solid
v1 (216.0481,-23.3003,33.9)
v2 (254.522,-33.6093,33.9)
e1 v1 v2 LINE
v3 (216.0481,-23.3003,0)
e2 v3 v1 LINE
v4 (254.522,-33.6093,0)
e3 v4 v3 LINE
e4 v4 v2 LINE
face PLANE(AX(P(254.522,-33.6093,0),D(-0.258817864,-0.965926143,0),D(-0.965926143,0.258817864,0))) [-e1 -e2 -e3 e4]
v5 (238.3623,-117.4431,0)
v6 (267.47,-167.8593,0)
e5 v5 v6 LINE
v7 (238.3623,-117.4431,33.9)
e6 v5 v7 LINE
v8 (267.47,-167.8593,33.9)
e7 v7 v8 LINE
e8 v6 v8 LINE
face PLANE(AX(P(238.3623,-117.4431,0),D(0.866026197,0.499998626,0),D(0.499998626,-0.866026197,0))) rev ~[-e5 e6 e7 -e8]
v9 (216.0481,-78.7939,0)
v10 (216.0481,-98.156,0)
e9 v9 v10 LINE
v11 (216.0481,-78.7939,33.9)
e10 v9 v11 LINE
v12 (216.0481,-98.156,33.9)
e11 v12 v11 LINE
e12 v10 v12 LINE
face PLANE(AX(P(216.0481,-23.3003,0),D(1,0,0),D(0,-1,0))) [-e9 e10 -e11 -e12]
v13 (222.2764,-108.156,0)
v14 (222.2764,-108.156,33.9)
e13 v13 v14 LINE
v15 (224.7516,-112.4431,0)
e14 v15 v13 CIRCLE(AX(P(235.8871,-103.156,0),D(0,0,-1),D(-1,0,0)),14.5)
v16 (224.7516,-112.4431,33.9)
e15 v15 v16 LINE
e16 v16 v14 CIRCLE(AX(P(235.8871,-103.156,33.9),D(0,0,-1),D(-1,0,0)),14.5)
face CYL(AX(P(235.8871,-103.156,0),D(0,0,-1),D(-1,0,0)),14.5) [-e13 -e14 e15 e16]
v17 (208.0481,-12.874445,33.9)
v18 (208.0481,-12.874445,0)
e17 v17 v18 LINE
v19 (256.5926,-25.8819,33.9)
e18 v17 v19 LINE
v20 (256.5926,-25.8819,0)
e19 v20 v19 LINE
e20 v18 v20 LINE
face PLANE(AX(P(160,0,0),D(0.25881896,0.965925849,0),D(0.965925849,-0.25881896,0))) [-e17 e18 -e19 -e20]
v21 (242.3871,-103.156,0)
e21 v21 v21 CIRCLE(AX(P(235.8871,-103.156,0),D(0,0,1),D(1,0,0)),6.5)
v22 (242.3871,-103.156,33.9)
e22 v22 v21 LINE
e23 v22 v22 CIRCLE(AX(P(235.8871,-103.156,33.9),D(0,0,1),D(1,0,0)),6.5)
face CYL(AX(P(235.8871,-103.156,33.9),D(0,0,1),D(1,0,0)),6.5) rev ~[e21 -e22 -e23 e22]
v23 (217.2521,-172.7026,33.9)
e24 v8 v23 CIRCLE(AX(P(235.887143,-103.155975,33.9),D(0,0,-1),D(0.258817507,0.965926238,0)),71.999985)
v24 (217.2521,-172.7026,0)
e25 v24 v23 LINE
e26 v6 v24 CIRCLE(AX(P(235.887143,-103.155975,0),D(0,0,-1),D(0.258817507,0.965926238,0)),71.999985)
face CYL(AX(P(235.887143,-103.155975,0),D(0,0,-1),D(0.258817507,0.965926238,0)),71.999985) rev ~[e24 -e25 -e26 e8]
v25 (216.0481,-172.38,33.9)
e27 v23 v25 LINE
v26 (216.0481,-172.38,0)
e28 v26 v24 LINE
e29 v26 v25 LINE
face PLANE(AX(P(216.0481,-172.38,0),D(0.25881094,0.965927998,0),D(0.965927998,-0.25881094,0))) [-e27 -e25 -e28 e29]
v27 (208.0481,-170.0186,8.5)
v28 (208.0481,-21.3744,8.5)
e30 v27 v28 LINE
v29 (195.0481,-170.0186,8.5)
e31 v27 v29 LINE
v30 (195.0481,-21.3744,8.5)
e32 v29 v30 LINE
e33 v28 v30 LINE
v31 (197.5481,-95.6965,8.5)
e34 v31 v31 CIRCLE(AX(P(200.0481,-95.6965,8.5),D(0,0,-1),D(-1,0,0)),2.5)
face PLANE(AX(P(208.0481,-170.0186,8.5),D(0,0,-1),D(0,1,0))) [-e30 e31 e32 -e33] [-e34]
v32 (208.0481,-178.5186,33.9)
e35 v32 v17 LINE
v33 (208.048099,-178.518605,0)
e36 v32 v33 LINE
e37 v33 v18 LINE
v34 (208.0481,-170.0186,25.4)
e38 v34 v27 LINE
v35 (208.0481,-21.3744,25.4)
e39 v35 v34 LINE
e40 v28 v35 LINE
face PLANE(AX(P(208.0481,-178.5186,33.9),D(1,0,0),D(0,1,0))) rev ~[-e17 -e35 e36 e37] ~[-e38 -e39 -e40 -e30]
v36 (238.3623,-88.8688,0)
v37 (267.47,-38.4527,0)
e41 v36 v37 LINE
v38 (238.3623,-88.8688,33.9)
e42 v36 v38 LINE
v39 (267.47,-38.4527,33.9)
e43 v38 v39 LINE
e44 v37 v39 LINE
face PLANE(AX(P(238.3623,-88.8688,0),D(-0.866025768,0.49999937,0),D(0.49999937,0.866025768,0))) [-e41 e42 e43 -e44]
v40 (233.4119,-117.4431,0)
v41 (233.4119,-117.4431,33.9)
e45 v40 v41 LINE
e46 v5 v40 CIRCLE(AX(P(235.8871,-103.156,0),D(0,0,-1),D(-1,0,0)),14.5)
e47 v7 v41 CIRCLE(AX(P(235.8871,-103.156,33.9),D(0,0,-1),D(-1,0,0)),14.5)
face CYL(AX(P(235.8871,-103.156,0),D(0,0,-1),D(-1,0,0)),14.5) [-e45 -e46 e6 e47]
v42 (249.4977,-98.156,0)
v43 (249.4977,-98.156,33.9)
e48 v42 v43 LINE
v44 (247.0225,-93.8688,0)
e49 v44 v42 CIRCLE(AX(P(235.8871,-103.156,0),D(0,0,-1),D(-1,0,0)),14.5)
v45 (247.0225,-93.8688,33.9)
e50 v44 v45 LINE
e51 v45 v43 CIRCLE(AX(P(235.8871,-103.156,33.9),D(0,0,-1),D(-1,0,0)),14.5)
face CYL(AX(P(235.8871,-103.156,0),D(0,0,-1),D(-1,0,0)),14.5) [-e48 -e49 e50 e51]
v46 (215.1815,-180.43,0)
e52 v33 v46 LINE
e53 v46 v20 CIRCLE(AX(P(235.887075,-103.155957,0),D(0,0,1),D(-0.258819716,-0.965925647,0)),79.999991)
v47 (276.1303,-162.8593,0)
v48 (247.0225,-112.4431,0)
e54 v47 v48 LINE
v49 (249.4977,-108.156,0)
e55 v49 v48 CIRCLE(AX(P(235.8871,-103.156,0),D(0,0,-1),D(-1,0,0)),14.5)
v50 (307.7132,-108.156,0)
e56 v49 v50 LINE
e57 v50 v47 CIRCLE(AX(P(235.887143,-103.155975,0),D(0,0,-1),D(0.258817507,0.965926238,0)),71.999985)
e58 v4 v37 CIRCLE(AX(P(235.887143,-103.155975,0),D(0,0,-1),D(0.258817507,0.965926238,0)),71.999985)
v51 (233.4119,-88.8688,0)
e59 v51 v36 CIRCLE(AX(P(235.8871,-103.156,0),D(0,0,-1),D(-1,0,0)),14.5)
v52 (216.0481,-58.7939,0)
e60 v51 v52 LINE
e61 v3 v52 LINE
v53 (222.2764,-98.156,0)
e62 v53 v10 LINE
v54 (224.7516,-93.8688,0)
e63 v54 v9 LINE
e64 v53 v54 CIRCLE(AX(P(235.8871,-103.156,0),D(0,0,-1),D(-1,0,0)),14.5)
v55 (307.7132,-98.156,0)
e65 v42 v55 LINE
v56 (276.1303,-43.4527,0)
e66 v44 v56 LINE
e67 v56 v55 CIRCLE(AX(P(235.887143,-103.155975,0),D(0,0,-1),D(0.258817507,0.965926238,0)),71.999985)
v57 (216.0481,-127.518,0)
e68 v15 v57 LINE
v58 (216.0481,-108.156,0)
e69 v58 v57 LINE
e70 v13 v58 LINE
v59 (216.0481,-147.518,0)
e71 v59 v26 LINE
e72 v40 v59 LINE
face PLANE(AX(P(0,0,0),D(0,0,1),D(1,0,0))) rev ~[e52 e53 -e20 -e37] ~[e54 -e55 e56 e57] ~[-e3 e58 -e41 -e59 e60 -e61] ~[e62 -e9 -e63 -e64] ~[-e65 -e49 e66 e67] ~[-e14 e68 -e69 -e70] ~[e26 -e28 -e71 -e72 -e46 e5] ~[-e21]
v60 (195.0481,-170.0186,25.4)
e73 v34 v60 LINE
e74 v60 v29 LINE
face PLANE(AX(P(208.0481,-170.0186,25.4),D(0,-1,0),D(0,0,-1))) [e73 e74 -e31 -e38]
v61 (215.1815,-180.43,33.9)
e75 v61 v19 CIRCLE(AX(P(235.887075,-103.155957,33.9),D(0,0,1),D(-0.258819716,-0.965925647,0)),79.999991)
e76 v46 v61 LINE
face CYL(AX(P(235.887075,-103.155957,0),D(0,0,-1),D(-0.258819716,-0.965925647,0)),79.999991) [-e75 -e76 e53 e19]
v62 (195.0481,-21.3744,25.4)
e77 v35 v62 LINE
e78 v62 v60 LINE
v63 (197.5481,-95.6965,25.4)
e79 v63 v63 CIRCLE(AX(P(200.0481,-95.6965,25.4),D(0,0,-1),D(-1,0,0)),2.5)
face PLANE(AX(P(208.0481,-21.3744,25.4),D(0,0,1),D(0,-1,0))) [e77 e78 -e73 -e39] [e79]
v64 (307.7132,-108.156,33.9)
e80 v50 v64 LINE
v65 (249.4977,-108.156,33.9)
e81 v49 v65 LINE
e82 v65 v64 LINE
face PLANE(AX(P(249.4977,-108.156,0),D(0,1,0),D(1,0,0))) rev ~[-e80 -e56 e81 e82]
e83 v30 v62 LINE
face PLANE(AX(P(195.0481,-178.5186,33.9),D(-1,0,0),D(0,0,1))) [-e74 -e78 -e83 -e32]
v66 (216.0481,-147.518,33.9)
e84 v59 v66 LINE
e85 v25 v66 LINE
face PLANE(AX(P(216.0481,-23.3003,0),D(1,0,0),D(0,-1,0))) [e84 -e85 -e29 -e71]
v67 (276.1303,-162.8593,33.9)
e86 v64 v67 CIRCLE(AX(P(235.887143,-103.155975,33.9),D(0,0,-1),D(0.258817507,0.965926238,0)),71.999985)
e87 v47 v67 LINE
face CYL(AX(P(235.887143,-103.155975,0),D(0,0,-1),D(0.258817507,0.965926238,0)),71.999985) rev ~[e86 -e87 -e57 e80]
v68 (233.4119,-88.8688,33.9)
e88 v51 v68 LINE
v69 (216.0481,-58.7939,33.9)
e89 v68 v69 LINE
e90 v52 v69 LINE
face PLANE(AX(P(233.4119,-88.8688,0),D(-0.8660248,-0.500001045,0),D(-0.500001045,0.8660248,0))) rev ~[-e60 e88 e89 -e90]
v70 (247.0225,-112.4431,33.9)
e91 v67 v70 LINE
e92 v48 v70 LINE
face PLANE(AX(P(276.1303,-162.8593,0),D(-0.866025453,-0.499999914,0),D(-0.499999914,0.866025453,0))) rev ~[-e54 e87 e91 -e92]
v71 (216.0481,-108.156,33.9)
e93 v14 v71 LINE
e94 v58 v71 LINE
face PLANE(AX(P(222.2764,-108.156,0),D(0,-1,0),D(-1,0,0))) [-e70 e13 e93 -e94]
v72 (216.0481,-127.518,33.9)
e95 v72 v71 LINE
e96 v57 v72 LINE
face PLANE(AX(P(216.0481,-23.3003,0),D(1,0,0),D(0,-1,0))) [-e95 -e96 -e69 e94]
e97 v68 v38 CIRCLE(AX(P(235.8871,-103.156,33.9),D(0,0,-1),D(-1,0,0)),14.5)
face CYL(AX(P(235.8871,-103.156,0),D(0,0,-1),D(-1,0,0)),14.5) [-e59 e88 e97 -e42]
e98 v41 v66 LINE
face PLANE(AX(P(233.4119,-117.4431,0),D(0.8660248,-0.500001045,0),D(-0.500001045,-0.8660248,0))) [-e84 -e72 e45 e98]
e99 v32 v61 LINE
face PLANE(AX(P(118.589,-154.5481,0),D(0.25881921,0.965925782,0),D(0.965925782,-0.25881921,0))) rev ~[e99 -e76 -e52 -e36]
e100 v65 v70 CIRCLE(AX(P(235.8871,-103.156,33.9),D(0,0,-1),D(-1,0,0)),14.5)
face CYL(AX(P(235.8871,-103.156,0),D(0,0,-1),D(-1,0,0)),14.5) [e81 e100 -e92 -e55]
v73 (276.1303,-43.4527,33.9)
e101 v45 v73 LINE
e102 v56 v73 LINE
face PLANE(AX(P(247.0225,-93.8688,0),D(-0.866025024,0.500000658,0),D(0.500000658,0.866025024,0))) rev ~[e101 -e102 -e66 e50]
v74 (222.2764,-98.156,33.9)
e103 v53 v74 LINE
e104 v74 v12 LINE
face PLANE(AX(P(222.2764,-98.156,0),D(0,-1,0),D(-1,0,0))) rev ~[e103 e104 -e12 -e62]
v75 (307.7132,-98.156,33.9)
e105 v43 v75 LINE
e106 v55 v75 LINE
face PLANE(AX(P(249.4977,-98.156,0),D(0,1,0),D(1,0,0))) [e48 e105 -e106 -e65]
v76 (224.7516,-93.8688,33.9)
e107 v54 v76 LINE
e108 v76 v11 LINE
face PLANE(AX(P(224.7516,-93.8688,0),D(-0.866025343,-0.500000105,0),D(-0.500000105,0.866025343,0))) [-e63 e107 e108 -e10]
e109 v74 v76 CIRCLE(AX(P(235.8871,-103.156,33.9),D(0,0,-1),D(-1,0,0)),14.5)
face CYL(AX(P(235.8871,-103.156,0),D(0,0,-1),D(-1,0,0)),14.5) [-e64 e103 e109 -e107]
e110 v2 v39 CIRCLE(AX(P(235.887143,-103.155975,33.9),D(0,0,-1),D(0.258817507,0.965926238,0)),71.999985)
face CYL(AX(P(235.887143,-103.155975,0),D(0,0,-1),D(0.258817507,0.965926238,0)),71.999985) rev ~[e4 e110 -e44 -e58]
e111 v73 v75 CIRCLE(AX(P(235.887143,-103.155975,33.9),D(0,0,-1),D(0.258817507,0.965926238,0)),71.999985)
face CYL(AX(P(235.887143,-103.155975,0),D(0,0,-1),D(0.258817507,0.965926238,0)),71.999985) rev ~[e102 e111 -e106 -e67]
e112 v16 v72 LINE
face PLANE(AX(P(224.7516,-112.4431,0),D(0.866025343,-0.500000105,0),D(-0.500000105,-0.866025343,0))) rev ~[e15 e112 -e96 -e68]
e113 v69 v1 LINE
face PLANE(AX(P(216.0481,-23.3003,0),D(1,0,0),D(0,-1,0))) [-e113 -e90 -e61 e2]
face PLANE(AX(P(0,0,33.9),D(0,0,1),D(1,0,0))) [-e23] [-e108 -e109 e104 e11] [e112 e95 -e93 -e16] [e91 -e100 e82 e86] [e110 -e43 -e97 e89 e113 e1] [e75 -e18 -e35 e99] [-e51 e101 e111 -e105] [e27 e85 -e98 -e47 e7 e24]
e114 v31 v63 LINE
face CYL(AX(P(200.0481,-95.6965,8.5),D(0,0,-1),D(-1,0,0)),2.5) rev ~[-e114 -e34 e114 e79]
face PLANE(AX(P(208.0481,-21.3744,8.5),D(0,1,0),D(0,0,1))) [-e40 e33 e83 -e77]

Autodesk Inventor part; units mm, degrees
ref_plane "YZ Plane" through (0, 0, 0) normal (1, 0, 0) x (0, 1, 0)
ref_plane "XZ Plane" through (0, 0, 0) normal (0, 1, 0) x (-1, 0, 0)
ref_plane "XY Plane" through (0, 0, 0) normal (0, 0, 1) x (1, 0, 0)
sketch "Sketch1" plane through (0, 0, 0) normal (0, 0, 1) x (1, 0, 0)
  line L0 (0, 0) -> (160, 0)
  line L1 (160, 0) -> (118.589, -154.5481) construction
  line L2 (0, 0) -> (41.411, -154.5481) construction
  line L3 (41.411, -154.5481) -> (118.589, -154.5481)
  circle A0 centre (235.8871, -103.156) radius 80 construction
  line L4 (160, 0) -> (256.5926, -25.8819)
  line L5 (118.589, -154.5481) -> (215.1815, -180.43)
  arc A1 (215.1815, -180.43) -> (256.5926, -25.8819) centre (235.8871, -103.156) ccw
  circle A2 centre (-75.8871, -103.156) radius 80 construction
  line L6 (0, 0) -> (-96.5926, -25.8819)
  line L7 (41.411, -154.5481) -> (-55.1815, -180.43)
  arc A3 (-96.5926, -25.8819) -> (-55.1815, -180.43) centre (-75.8871, -103.156) ccw
  dimension "d0" = 160
  dimension "d1" = 160
  dimension "d2" = 160
  dimension "d3" = 75
  dimension "d4" = 75
  dimension "d5" = 160
  dimension "d6" = 100
  dimension "d7" = 160
  dimension "d9" = 100
extrude "Extrusion1" add sketch "Sketch1" along normal blind 33.9
sketch "Sketch2" plane through (0, 0, 33.9) normal (0, 0, 1) x (1, 0, 0)
  line L0 (-26.5, -133) -> (186.5, -133)
  line L1 (186.5, -133) -> (186.5, -20)
  line L2 (186.5, -20) -> (-26.5, -20)
  line L3 (-26.5, -20) -> (-26.5, -133)
  line L4 (160, 0) -> (0, 0) projected
  point P0 (80, -20)
  point P1 (80, 0)
  dimension "d12" = 213
  dimension "d13" = 113
  dimension "d14" = 20
extrude "Extrusion2" cut sketch "Sketch2" against normal through all
sketch "Sketch3" plane through (0, 0, 33.9) normal (0, 0, 1) x (1, 0, 0)
  line L0 (-26.5, -133) -> (-26.5, -20) construction
  line L1 (-26.5, -20) -> (186.5, -20) construction
  line L2 (186.5, -20) -> (186.5, -133) construction
  line L3 (186.5, -133) -> (-26.5, -133) construction
  line L4 (-48.0481, 1.5481) -> (-48.0481, -154.5481) construction
  line L5 (-48.0481, -154.5481) -> (208.0481, -154.5481) construction
  line L6 (208.0481, -154.5481) -> (208.0481, 1.5481) construction
  line L7 (208.0481, 1.5481) -> (-48.0481, 1.5481) construction
  line L8 (41.411, -154.5481) -> (118.589, -154.5481) construction
  line L9 (-48.0481, 1.5481) -> (-48.0481, -178.5186) construction
  line L10 (-55.1815, -180.43) -> (41.411, -154.5481) construction
  line L11 (208.0481, 1.5481) -> (208.0481, -178.5186) construction
  line L12 (118.589, -154.5481) -> (215.1815, -180.43) construction
  line L13 (-48.0481, -178.5186) -> (208.0481, -178.5186) construction
  line L14 (-48.0481, 1.5481) -> (208.0481, 1.5481) construction
  line L15 (160, 0) -> (256.5926, -25.8819) construction
  line L16 (208.2963, -12.941) -> (208.0481, -178.5186)
  line L17 (208.2963, -12.941) -> (256.5926, -25.8819)
  line L18 (208.0481, -178.5186) -> (215.1815, -180.43)
  arc A0 (215.1815, -180.43) -> (256.5926, -25.8819) centre (235.8871, -103.156) ccw
  line L19 (208.0481, 1.5481) -> (-166.9519, 1.5481)
  line L20 (-166.9519, 1.5481) -> (-166.9519, -188.4519)
  line L21 (-166.9519, -188.4519) -> (208.0481, -188.4519)
  line L22 (208.0481, -188.4519) -> (208.0481, 1.5481)
  point P0 (0, 0)
  point P1 (80, -154.5481)
  dimension "d17" = 190
  dimension "d18" = 375
extrude "Extrusion3" cut sketch "Sketch3" against normal through all contours L22 L21 L20 L19
sketch "Sketch4" plane through (0, 0, 33.9) normal (0, 0, 1) x (1, 0, 0)
  arc A0 (215.1815, -180.43) -> (256.5926, -25.8819) centre (235.8871, -103.156) ccw projected
  circle A1 centre (235.8871, -103.156) radius 6.5
  point P0 (0, 0)
  dimension "d21" = 13
extrude "Extrusion4" cut sketch "Sketch4" against normal through all
sketch "Sketch5" plane through (208.0481, -178.5186, 33.9) normal (-1, 0, 0) x (0, 0, 1)
  line L0 (-33.9, 165.6442) -> (0, 165.6442) projected
  line L1 (-33.9, 0) -> (-33.9, 165.6442) projected
  line L2 (0, 0) -> (-33.9, 0) projected
  line L3 (0, 165.6442) -> (0, 0) projected
  line L4 (-25.4, 157.1442) -> (-8.5, 157.1442)
  line L5 (-8.5, 157.1442) -> (-8.5, 8.5)
  line L6 (-8.5, 8.5) -> (-25.4, 8.5)
  line L7 (-25.4, 8.5) -> (-25.4, 157.1442)
  point P0 (-33.9, 178.5186)
  dimension "d24" = 8.5
extrude "Extrusion5" add sketch "Sketch5" along normal blind 13 contours L4 L5 L6 L7
sketch "Sketch6" plane through (208.0481, -170.0186, 8.5) normal (0, 0, -1) x (-1, 0, 0)
  circle A0 centre (8, 74.3221) radius 2.5
  line L0 (0, -8.5) -> (0, 157.1442) projected
  point P0 (208.0481, 170.0186)
  point P1 (0, 74.3221)
  dimension "d27" = 5
  dimension "d28" = 8
extrude "Extrusion6" cut sketch "Sketch6" against normal through all
sketch "Sketch7" plane through (0, 0, 0) normal (0, 0, -1) x (-1, 0, 0)
  circle A0 centre (-235.8871, -103.156) radius 6.5 projected
  line L0 (-208.0481, -178.5186) -> (-208.0481, -12.8745) projected
  line L1 (-208.0481, -12.8745) -> (-256.5926, -25.8819) projected
  arc A1 (-256.5926, -25.8819) -> (-215.1815, -180.43) centre (-235.8871, -103.156) ccw projected
  line L2 (-215.1815, -180.43) -> (-208.0481, -178.5186) projected
  line L3 (-254.522, -33.6093) -> (-216.0481, -23.3003)
  line L4 (-216.0481, -23.3003) -> (-216.0481, -172.38)
  line L5 (-216.0481, -172.38) -> (-217.2521, -172.7026)
  arc A2 (-254.522, -33.6093) -> (-217.2521, -172.7026) centre (-235.8871, -103.156) ccw
  circle A3 centre (-235.8871, -103.156) radius 14.5
  point P0 (0, 0)
  dimension "d31" = 8
  dimension "d32" = 8
extrude "Extrusion7" cut sketch "Sketch7" against normal through all contours L3 L4 L5 A2
sketch "Sketch8" plane through (0, 0, 0) normal (0, 0, -1) x (-1, 0, 0)
  circle A0 centre (-235.8871, -103.156) radius 6.5 construction
  circle A1 centre (-235.8871, -103.156) radius 14.5 construction
  line L0 (-235.8871, -103.156) -> (-159.7277, -103.156) construction
  line L1 (-222.2764, -98.156) -> (-123.6167, -98.156) construction
  line L2 (-222.2764, -108.156) -> (-123.6167, -108.156) construction
  line L3 (-233.4119, -88.8688) -> (-184.082, -3.427) construction
  line L4 (-224.7516, -93.8688) -> (-175.4217, -8.427) construction
  line L5 (-247.0225, -93.8688) -> (-296.3524, -8.427) construction
  line L6 (-238.3623, -88.8688) -> (-287.6921, -3.427) construction
  line L7 (-249.4977, -108.156) -> (-348.1575, -108.156) construction
  line L8 (-249.4977, -98.156) -> (-348.1575, -98.156) construction
  line L9 (-238.3623, -117.4431) -> (-287.6921, -202.885) construction
  line L10 (-247.0225, -112.4431) -> (-296.3524, -197.885) construction
  line L11 (-224.7516, -112.4431) -> (-175.4217, -197.885) construction
  line L12 (-233.4119, -117.4431) -> (-184.082, -202.885) construction
  line L13 (-216.0481, -23.3003) -> (-216.0481, -172.38) construction
  arc A2 (-254.522, -33.6093) -> (-217.2521, -172.7026) centre (-235.8871, -103.156) ccw construction
  line L14 (-254.522, -33.6093) -> (-216.0481, -23.3003) construction
  line L15 (-216.0481, -172.38) -> (-217.2521, -172.7026) construction
  line L16 (-222.2764, -98.156) -> (-216.0481, -98.156)
  line L17 (-222.2764, -108.156) -> (-216.0481, -108.156)
  line L18 (-224.7516, -112.4431) -> (-216.0481, -127.518)
  line L19 (-233.4119, -117.4431) -> (-216.0481, -147.518)
  line L20 (-238.3623, -117.4431) -> (-267.47, -167.8593)
  line L21 (-276.1303, -162.8593) -> (-247.0225, -112.4431)
  line L22 (-249.4977, -108.156) -> (-307.7132, -108.156)
  line L23 (-249.4977, -98.156) -> (-307.7132, -98.156)
  line L24 (-247.0225, -93.8688) -> (-276.1303, -43.4527)
  line L25 (-238.3623, -88.8688) -> (-267.47, -38.4527)
  line L26 (-233.4119, -88.8688) -> (-216.0481, -58.7939)
  line L27 (-224.7516, -93.8688) -> (-216.0481, -78.7939)
  line L28 (-216.0481, -58.7939) -> (-216.0481, -78.7939)
  line L29 (-216.0481, -98.156) -> (-216.0481, -108.156)
  line L30 (-216.0481, -127.518) -> (-216.0481, -147.518)
  arc A3 (-267.47, -38.4527) -> (-276.1303, -43.4527) centre (-235.8871, -103.156) ccw
  arc A4 (-307.7132, -98.156) -> (-307.7132, -108.156) centre (-235.8871, -103.156) ccw
  arc A5 (-276.1303, -162.8593) -> (-267.47, -167.8593) centre (-235.8871, -103.156) ccw
  arc A6 (-222.2764, -108.156) -> (-222.2764, -98.156) centre (-235.8871, -103.156) ccw
  arc A7 (-233.4119, -117.4431) -> (-224.7516, -112.4431) centre (-235.8871, -103.156) ccw
  arc A8 (-247.0225, -112.4431) -> (-238.3623, -117.4431) centre (-235.8871, -103.156) ccw
  arc A9 (-249.4977, -98.156) -> (-249.4977, -108.156) centre (-235.8871, -103.156) ccw
  arc A10 (-238.3623, -88.8688) -> (-247.0225, -93.8688) centre (-235.8871, -103.156) ccw
  arc A11 (-224.7516, -93.8688) -> (-233.4119, -88.8688) centre (-235.8871, -103.156) ccw
  point P0 (0, 0)
  dimension "d36" = 5
  dimension "d37" = 5
  dimension "d40" = 360
extrude "Extrusion8" add sketch "Sketch8" against normal blind 33.9
properties part number "Riser Base" material "ABS Plastic"
